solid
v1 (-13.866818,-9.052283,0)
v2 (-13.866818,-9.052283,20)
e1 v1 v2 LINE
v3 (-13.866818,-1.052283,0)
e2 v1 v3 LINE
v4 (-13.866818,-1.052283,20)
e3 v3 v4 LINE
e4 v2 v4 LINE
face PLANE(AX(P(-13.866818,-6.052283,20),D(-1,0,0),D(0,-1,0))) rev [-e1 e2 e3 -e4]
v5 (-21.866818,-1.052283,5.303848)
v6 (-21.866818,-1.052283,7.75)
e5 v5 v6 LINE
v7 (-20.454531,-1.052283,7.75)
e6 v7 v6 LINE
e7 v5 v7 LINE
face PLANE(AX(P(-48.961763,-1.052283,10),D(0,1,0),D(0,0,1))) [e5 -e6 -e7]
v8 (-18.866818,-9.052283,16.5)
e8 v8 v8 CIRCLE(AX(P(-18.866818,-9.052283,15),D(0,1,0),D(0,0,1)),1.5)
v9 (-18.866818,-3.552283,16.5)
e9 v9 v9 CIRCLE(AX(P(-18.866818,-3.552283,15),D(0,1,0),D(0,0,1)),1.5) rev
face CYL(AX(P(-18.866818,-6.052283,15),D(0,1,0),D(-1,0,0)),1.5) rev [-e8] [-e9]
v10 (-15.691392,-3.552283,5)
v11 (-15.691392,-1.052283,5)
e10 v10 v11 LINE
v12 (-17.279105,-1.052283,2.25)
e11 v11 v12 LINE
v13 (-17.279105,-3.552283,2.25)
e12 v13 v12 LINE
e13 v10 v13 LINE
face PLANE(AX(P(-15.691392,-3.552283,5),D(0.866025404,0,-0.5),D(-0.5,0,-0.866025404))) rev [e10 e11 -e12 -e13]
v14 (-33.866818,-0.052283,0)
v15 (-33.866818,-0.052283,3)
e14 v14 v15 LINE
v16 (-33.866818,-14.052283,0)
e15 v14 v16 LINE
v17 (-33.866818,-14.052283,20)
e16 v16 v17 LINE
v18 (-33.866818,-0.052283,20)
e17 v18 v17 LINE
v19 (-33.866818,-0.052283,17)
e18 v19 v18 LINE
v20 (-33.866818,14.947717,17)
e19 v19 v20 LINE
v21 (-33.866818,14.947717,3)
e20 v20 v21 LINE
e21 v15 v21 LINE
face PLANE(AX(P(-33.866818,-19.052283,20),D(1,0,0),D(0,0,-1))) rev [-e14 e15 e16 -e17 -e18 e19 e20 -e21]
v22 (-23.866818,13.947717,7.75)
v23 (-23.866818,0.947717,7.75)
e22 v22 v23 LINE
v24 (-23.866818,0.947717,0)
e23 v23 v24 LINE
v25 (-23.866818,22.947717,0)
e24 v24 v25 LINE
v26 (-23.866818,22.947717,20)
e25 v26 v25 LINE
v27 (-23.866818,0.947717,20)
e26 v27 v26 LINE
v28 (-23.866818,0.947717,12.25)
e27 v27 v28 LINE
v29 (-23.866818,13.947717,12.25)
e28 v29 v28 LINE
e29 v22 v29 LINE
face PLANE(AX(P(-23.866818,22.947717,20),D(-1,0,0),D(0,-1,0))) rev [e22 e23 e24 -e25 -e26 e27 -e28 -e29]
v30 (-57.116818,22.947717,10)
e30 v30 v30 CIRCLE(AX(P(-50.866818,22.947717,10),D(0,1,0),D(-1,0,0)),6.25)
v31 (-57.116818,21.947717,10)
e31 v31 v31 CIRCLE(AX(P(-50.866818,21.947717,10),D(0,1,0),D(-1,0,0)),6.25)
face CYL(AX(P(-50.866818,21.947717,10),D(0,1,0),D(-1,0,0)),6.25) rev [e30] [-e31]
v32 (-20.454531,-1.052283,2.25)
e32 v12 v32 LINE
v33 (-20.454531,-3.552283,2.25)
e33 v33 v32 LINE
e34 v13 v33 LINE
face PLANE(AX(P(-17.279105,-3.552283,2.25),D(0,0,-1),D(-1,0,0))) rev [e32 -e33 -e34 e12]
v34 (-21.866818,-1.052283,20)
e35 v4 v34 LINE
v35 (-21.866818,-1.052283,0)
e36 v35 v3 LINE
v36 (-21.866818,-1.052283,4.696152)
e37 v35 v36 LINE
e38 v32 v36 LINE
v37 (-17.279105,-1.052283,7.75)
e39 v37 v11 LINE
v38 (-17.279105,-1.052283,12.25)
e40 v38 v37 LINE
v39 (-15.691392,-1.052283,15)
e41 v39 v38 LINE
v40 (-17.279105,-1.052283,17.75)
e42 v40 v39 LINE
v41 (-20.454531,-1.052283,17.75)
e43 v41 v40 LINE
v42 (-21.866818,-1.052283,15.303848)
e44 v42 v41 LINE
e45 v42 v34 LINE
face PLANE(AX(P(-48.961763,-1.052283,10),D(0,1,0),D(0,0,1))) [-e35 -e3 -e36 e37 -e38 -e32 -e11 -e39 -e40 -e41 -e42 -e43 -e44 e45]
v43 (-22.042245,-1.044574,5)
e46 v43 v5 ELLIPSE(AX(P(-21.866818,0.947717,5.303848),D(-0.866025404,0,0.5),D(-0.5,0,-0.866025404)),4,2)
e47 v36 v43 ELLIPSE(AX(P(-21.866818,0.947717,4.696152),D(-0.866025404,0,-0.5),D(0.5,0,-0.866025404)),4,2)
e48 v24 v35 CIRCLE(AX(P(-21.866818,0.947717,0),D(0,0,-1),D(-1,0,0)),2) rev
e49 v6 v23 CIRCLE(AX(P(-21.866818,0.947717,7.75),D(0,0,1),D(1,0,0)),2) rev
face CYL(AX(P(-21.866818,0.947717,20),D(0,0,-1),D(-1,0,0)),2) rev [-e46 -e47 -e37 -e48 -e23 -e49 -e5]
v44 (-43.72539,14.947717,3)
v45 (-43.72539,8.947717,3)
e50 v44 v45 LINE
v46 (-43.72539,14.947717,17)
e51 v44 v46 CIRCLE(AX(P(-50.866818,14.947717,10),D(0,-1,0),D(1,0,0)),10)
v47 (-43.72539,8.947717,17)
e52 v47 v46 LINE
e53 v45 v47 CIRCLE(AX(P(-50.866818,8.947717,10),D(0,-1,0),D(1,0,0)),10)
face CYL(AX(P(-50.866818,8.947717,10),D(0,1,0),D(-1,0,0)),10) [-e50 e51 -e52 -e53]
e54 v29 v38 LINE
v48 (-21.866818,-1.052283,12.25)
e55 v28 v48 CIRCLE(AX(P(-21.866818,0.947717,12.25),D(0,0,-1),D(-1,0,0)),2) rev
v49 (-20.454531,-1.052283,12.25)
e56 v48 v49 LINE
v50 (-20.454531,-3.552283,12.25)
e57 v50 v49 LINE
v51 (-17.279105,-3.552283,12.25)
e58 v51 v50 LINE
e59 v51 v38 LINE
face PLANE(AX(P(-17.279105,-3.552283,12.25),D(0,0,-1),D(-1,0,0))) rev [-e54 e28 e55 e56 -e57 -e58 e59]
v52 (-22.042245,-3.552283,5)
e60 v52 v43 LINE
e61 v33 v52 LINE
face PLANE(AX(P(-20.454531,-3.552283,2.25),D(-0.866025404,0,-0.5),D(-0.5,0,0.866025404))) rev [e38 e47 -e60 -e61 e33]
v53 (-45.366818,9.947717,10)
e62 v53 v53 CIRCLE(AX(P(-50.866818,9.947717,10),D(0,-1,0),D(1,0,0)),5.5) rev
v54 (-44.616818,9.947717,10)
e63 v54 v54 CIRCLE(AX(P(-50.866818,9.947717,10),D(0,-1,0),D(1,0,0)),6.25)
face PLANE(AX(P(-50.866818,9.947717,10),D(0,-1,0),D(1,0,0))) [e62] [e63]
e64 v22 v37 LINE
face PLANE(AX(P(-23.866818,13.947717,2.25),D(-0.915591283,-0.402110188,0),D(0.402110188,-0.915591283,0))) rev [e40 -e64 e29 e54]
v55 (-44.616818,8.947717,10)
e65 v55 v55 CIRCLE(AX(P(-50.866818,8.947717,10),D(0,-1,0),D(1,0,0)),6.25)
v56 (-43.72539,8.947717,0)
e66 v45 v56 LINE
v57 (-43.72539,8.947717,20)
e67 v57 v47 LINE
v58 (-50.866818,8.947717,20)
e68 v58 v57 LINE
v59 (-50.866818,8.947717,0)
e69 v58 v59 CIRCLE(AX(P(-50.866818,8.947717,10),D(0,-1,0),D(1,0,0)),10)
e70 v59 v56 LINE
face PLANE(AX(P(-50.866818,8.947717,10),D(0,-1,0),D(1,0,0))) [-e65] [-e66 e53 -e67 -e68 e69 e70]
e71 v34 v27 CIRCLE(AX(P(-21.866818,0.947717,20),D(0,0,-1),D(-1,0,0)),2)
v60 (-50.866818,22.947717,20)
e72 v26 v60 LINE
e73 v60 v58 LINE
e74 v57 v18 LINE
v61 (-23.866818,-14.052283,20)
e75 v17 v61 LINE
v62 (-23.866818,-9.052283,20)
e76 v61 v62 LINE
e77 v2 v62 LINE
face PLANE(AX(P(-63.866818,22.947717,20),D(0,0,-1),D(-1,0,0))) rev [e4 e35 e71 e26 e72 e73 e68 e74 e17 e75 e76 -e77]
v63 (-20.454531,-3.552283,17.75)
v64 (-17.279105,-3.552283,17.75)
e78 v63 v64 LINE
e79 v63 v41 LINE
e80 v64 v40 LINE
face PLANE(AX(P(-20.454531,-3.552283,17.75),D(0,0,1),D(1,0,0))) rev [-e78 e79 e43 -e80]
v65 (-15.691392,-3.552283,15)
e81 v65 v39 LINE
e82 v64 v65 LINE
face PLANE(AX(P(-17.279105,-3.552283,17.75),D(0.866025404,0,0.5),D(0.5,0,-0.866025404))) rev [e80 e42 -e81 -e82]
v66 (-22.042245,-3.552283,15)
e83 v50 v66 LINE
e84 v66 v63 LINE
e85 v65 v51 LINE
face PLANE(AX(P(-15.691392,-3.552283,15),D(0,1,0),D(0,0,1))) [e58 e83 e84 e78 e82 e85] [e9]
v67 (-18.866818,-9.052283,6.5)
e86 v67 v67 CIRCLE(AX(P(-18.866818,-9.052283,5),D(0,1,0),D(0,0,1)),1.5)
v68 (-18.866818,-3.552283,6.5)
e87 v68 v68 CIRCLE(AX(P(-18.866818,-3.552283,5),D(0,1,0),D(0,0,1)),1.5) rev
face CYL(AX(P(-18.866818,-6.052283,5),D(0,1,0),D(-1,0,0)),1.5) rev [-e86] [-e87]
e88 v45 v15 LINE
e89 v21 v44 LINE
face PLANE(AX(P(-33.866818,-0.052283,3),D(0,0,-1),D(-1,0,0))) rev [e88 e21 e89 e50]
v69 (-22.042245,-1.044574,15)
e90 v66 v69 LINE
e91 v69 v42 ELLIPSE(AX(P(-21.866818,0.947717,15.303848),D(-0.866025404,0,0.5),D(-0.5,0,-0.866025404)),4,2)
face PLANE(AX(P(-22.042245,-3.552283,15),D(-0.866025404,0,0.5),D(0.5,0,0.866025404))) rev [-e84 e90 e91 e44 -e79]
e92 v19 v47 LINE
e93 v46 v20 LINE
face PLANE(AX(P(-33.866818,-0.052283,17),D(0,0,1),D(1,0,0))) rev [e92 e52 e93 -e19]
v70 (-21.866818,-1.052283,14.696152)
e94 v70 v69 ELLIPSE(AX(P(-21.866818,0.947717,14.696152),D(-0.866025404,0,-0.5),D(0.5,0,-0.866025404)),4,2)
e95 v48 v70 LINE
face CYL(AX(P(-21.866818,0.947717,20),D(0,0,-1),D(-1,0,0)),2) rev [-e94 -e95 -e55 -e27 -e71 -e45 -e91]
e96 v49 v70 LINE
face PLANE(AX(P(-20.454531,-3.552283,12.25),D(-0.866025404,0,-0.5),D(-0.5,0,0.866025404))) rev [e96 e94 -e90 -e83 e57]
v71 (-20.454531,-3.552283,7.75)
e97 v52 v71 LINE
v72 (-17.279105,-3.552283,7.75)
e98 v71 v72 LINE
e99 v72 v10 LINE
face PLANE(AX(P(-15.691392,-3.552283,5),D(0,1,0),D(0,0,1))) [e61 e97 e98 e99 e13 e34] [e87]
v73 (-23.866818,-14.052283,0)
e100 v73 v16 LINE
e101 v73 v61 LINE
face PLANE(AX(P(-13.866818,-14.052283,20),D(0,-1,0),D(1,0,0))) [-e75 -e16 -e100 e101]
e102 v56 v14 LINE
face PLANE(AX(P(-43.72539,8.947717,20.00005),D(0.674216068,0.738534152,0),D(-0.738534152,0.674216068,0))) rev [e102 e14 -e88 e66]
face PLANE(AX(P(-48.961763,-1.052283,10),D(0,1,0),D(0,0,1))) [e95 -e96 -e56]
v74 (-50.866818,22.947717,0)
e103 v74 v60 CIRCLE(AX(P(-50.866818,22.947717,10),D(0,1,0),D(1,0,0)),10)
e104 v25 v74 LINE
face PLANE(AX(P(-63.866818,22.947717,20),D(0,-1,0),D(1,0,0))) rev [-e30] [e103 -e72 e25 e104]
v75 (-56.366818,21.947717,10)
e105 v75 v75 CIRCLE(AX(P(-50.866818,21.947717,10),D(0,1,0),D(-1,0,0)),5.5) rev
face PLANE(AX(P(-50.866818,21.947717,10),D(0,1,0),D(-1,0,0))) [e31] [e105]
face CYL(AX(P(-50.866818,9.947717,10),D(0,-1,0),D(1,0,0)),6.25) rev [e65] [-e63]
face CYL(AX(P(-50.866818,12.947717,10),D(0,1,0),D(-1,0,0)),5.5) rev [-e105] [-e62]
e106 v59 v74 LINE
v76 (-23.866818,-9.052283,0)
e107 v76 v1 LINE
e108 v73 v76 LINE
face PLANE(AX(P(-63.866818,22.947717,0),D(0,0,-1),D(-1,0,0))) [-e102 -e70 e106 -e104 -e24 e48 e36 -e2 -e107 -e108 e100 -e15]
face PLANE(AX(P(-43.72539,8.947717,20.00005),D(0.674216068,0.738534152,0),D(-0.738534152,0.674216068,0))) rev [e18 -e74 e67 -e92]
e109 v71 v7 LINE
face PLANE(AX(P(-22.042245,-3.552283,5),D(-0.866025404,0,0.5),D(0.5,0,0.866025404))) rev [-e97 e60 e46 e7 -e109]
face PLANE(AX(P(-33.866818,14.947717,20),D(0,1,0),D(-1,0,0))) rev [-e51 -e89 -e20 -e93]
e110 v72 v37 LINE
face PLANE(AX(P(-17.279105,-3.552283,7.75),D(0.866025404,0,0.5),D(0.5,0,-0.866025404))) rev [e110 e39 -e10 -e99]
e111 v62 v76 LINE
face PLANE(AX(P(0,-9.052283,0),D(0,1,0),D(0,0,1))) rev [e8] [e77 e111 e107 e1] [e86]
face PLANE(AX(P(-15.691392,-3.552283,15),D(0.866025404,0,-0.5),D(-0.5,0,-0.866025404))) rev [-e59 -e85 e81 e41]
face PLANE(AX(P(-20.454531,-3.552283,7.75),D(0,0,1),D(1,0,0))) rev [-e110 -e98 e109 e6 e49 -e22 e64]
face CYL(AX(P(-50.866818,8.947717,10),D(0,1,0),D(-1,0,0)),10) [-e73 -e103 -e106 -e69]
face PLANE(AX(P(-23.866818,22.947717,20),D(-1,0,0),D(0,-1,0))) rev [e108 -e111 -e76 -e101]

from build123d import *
from build123d.topology import SkipClean

# Parameters (mm, degrees)
EXTRUDE_1_DEPTH           = 20
SKETCH_3_R                = 5.5
CUT_EXTRUDE_2_DEPTH       = 10
SKETCH_9_R                = 6.25
CUT_EXTRUDE_6_DEPTH       = 1
SKETCH_11_W               = 20
SKETCH_11_H               = 5
EXTRUDE_4_DEPTH           = 10
CUT_EXTRUDE_8_REACH       = 78.472
SKETCH_12_R               = 1.5
SKETCH_13_R               = 3
CUT_EXTRUDE_9_DEPTH       = 2.5
SKETCH_14_R               = 10
SKETCH_14_R_2             = 5.5
EXTRUDE_5_DEPTH           = 6
CUT_EXTRUDE_START         = -1
SKETCH_6_R                = 6.25
CUT_EXTRUDE_10_DEPTH      = 1
SKETCH_15_W               = 20
SKETCH_15_H               = 5
EXTRUDE_6_DEPTH           = 5
SKETCH_16_W               = 17
SKETCH_16_H               = 3
EXTRUDE_7_DEPTH           = 15
CUT_EXTRUDE_11_DEPTH      = 70.961190435
CUT_EXTRUDE_11_DEPTH_BACK = 70.961190435
EXTRUDE_START             = -5
SKETCH_3D_3_R             = 1.5
EXTRUDE_8_DEPTH           = 5
CUT_EXTRUDE_12_DEPTH      = 2.5
FILLET_1_R                = 2
CUT_EXTRUDE_14_DEPTH      = 76.06644022
SKETCH_21_W               = 6.587713241
SKETCH_21_H               = 4.5
EXTRUDE_9_DEPTH           = 15
SKETCH_23_W               = 25
SKETCH_23_H               = 20
CUT_EXTRUDE_16_DEPTH      = 5
CUT_EXTRUDE_17_DEPTH      = 10
SKETCH_25_W               = 10
SKETCH_25_H               = 20
EXTRUDE_10_DEPTH          = 3
SKETCH_26_R               = 1.5
CUT_EXTRUDE_18_DEPTH      = 71.326165394
SKETCH_27_R               = 1.5
CUT_EXTRUDE_19_DEPTH      = 71.326165394


with BuildPart() as part:
    # 草图1 → 凸台-拉伸1 (new body)
    with BuildSketch(Plane.XY):
        Polygon((-63.866818046, 22.947717095), (-23.866818046, 22.947717095), (-23.866818046, -19.052282905), (-33.866818046, -19.052282905), (-33.866818046, 14.947717095), (-63.866818046, 14.947717095), align=None)
    extrude(amount=EXTRUDE_1_DEPTH)

    # 草图3 → 切除-拉伸2 (cut)
    with BuildSketch(Plane(origin=(0, 22.947717095, 0), x_dir=(-1, 0, 0), z_dir=(0, 1, 0))):
        with Locations((50.866818046, 10)):
            Circle(SKETCH_3_R)
    extrude(amount=-CUT_EXTRUDE_2_DEPTH, mode=Mode.SUBTRACT)

    # 草图9 → 切除-拉伸6 (cut)
    with BuildSketch(Plane(origin=(0, 22.947717095, 0), x_dir=(1, 0, 0), z_dir=(0, 1, 0))):
        with Locations(Location((-50.866818046, -10, 0), (0, 0, 180))):
            Circle(SKETCH_9_R)
    extrude(amount=-CUT_EXTRUDE_6_DEPTH, mode=Mode.SUBTRACT)

    # 草图11 → 凸台-拉伸4 (add)
    with BuildSketch(Plane(origin=(-23.866818046, 0, 0), x_dir=(0, 0, -1), z_dir=(1, 0, 0))):
        with Locations((-10, -16.552282905)):
            Rectangle(SKETCH_11_W, SKETCH_11_H)
    extrude(amount=EXTRUDE_4_DEPTH)

    # 草图12 → 切除-拉伸8 (cut, up to next)
    with BuildSketch(Plane(origin=(0, -14.052282905, 0), x_dir=(-1, 0, 0), z_dir=(0, 1, 0)), mode=Mode.PRIVATE) as cut_extrude_8_sk1:
        with Locations((18.866818046, 5)):
            Circle(SKETCH_12_R)
    cut_extrude_8_tool1 = extrude(cut_extrude_8_sk1.sketch, amount=-CUT_EXTRUDE_8_REACH, mode=Mode.PRIVATE) & part.part
    # 草图12 → 切除-拉伸8 (cut, up to next)
    with BuildSketch(Plane(origin=(0, -14.052282905, 0), x_dir=(-1, 0, 0), z_dir=(0, 1, 0)), mode=Mode.PRIVATE) as cut_extrude_8_sk2:
        with Locations((18.866818046, 15)):
            Circle(SKETCH_12_R)
    cut_extrude_8_tool2 = extrude(cut_extrude_8_sk2.sketch, amount=-CUT_EXTRUDE_8_REACH, mode=Mode.PRIVATE) & part.part
    add(cut_extrude_8_tool1.solids().sort_by_distance((-18.866818, -14.052283, 5))[0], mode=Mode.SUBTRACT)
    add(cut_extrude_8_tool2.solids().sort_by_distance((-18.866818, -14.052283, 15))[0], mode=Mode.SUBTRACT)

    # 草图13 → 切除-拉伸9 (cut)
    with BuildSketch(Plane.XZ.offset(19.052282905)):
        with Locations(Location((-18.866818046, 15, 0), (0, 0, 270))):
            Circle(SKETCH_13_R)
        with Locations(Location((-18.866818046, 5, 0), (0, 0, 270))):
            Circle(SKETCH_13_R)
    extrude(amount=-CUT_EXTRUDE_9_DEPTH, mode=Mode.SUBTRACT)

    # 草图14 → 凸台-拉伸5 (add)
    with SkipClean():  # the faces are left unmerged after this step: merging them gives an invalid solid
        with BuildSketch(Plane.XZ.offset(-14.947717095)):
            with Locations(Location((-50.866818046, 10, 0), (0, 0, 270))):
                Circle(SKETCH_14_R)
            with Locations(Location((-50.866818046, 10, 0), (0, 0, 180))):
                Circle(SKETCH_14_R_2, mode=Mode.SUBTRACT)
        extrude(amount=EXTRUDE_5_DEPTH)

    # 草图6 → 切除-拉伸10 (cut)
    with BuildSketch(Plane.XZ.offset(-8.947717095).offset(CUT_EXTRUDE_START)):
        with Locations(Location((-50.866818046, 10, 0), (0, 0, 180))):
            Circle(SKETCH_6_R)
    extrude(amount=CUT_EXTRUDE_10_DEPTH, mode=Mode.SUBTRACT)

    # 草图15 → 凸台-拉伸6 (add)
    with BuildSketch(Plane(origin=(-13.866818046, 0, 0), x_dir=(0, 0, -1), z_dir=(1, 0, 0))):
        with Locations((-10, -16.552282905)):
            Rectangle(SKETCH_15_W, SKETCH_15_H)
    extrude(amount=EXTRUDE_6_DEPTH)

    # 草图16 → 凸台-拉伸7 (add)
    with BuildSketch(Plane.XZ.offset(-14.947717095)):
        with Locations((-42.366818046, 18.5)):
            Rectangle(SKETCH_16_W, SKETCH_16_H)
        with Locations((-42.366818046, 1.5)):
            Rectangle(SKETCH_16_W, SKETCH_16_H)
    extrude(amount=EXTRUDE_7_DEPTH)

    # 草图17 → 切除-拉伸11 (cut, two sides: drawn at the far end of the back side and taken through both)
    with BuildSketch(Plane(origin=(0, 0, 17), x_dir=(-1, 0, 0), z_dir=(0, 0, -1)).offset(-CUT_EXTRUDE_11_DEPTH_BACK)):
        Polygon((50.866818046, 8.947717095), (43.725389617, 8.947717095), (33.866818046, -0.052282905), (50.866818046, -0.052282905), align=None)
    extrude(amount=CUT_EXTRUDE_11_DEPTH + CUT_EXTRUDE_11_DEPTH_BACK, mode=Mode.SUBTRACT)

    # Sketch 3D_3 → 凸台-拉伸8 (add)
    with BuildSketch(Plane(origin=(-23.866818046, -6.052282905, 20), x_dir=(0.447213595499958, 0, -0.894427190999916), z_dir=(0, -1, 0)).offset(EXTRUDE_START)):
        Polygon((0, 0), (4.472135955, 8.94427191), (22.360679775, 0), (17.88854382, -8.94427191), align=None)
        with Locations(Location((6.708203932, 2.236067977, 0), (0, 0, 243.434948823))):
            Circle(SKETCH_3D_3_R, mode=Mode.SUBTRACT)
        with Locations(Location((15.652475842, -2.236067977, 0), (0, 0, 243.434948823))):
            Circle(SKETCH_3D_3_R, mode=Mode.SUBTRACT)
    extrude(amount=EXTRUDE_8_DEPTH)

    # 草图18 → 切除-拉伸12 (cut)
    with BuildSketch(Plane(origin=(0, -1.052282905, 0), x_dir=(-1, 0, 0), z_dir=(0, 1, 0))):
        Polygon((15.691391565, 15), (17.279104805, 12.25), (20.454531286, 12.25), (22.042244526, 15), (20.454531286, 17.75), (17.279104805, 17.75), align=None)
        Polygon((15.691391565, 5), (17.279104805, 2.25), (20.454531286, 2.25), (22.042244526, 5), (20.454531286, 7.75), (17.279104805, 7.75), align=None)
    extrude(amount=-CUT_EXTRUDE_12_DEPTH, mode=Mode.SUBTRACT)

    # 圆角1
    # the kernel refuses this fillet: 2 mm, written as the material it adds along each edge
    with BuildSketch(Plane(origin=(-23.866818046, -1.052282905, 0), x_dir=(0, 1, 0), z_dir=(0, 0, 1))) as fillet_1_piece_1_section:
        with BuildLine():
            CenterArc((FILLET_1_R, -FILLET_1_R), FILLET_1_R, 90, 90)
            Line((0, -FILLET_1_R), (0, 0))
            Line((0, 0), (FILLET_1_R, 0))
        make_face()
    fillet_1_piece_1 = extrude(amount=20, mode=Mode.PRIVATE)
    fillet_1_piece_1 = split(fillet_1_piece_1, bisect_by=Plane(origin=(-20.802583542, -0.671658343, 2.852844192), z_dir=(-0.8660254037844387, 0, -0.5000000000000001)), keep=Keep.TOP, mode=Mode.PRIVATE)
    fillet_1_piece_1 = split(fillet_1_piece_1, bisect_by=Plane(origin=(-23.907001975, -0.671658343, 1.770145354), z_dir=(0.8660254037844387, 0, -0.5000000000000003)), keep=Keep.TOP, mode=Mode.PRIVATE)
    add(fillet_1_piece_1)
    with BuildSketch(Plane(origin=(-23.866818046, -1.052282905, 0), x_dir=(0, 1, 0), z_dir=(0, 0, 1))) as fillet_1_piece_2_section:
        with BuildLine():
            CenterArc((FILLET_1_R, -FILLET_1_R), FILLET_1_R, 90, 90)
            Line((0, -FILLET_1_R), (0, 0))
            Line((0, 0), (FILLET_1_R, 0))
        make_face()
    fillet_1_piece_2 = extrude(amount=20, mode=Mode.PRIVATE)
    fillet_1_piece_2 = split(fillet_1_piece_2, bisect_by=Plane(origin=(-22.4188867, -0.519681884, 5.652363381), z_dir=(-0.8660254037844387, 0, -0.5000000000000001)), keep=Keep.TOP, mode=Mode.PRIVATE)
    fillet_1_piece_2 = split(fillet_1_piece_2, bisect_by=Plane(origin=(-22.4188867, -0.519681884, 4.347636619), z_dir=(-0.8660254037844387, 0, 0.5000000000000003)), keep=Keep.TOP, mode=Mode.PRIVATE)
    add(fillet_1_piece_2)
    with BuildSketch(Plane(origin=(-23.866818046, -1.052282905, 0), x_dir=(0, 1, 0), z_dir=(0, 0, 1))) as fillet_1_piece_3_section:
        with BuildLine():
            CenterArc((FILLET_1_R, -FILLET_1_R), FILLET_1_R, 90, 90)
            Line((0, -FILLET_1_R), (0, 0))
            Line((0, 0), (FILLET_1_R, 0))
        make_face()
    fillet_1_piece_3 = extrude(amount=20, mode=Mode.PRIVATE)
    fillet_1_piece_3 = split(fillet_1_piece_3, bisect_by=Plane(origin=(-24.519856268, -0.671658343, 9.291349419), z_dir=(0.8660254037844387, 0, 0.5000000000000001)), keep=Keep.TOP, mode=Mode.PRIVATE)
    fillet_1_piece_3 = split(fillet_1_piece_3, bisect_by=Plane(origin=(-20.189729249, -0.671658343, 8.208650581), z_dir=(-0.8660254037844387, 0, 0.5000000000000003)), keep=Keep.TOP, mode=Mode.PRIVATE)
    fillet_1_piece_3 = split(fillet_1_piece_3, bisect_by=Plane(origin=(-20.189729249, -0.671658343, 11.791349419), z_dir=(-0.8660254037844387, 0, -0.5)), keep=Keep.TOP, mode=Mode.PRIVATE)
    fillet_1_piece_3 = split(fillet_1_piece_3, bisect_by=Plane(origin=(-24.519856268, -0.671658343, 10.708650581), z_dir=(0.8660254037844384, 0, -0.5000000000000004)), keep=Keep.TOP, mode=Mode.PRIVATE)
    add(fillet_1_piece_3)
    with BuildSketch(Plane(origin=(-23.866818046, -1.052282905, 0), x_dir=(0, 1, 0), z_dir=(0, 0, 1))) as fillet_1_piece_4_section:
        with BuildLine():
            CenterArc((FILLET_1_R, -FILLET_1_R), FILLET_1_R, 90, 90)
            Line((0, -FILLET_1_R), (0, 0))
            Line((0, 0), (FILLET_1_R, 0))
        make_face()
    fillet_1_piece_4 = extrude(amount=20, mode=Mode.PRIVATE)
    fillet_1_piece_4 = split(fillet_1_piece_4, bisect_by=Plane(origin=(-22.4188867, -0.519681884, 15.652363381), z_dir=(-0.8660254037844387, 0, -0.5)), keep=Keep.TOP, mode=Mode.PRIVATE)
    fillet_1_piece_4 = split(fillet_1_piece_4, bisect_by=Plane(origin=(-22.4188867, -0.519681884, 14.347636619), z_dir=(-0.8660254037844384, 0, 0.5000000000000004)), keep=Keep.TOP, mode=Mode.PRIVATE)
    add(fillet_1_piece_4)
    with BuildSketch(Plane(origin=(-23.866818046, -1.052282905, 0), x_dir=(0, 1, 0), z_dir=(0, 0, 1))) as fillet_1_piece_5_section:
        with BuildLine():
            CenterArc((FILLET_1_R, -FILLET_1_R), FILLET_1_R, 90, 90)
            Line((0, -FILLET_1_R), (0, 0))
            Line((0, 0), (FILLET_1_R, 0))
        make_face()
    fillet_1_piece_5 = extrude(amount=20, mode=Mode.PRIVATE)
    fillet_1_piece_5 = split(fillet_1_piece_5, bisect_by=Plane(origin=(-23.907001975, -0.671658343, 18.229854646), z_dir=(0.8660254037844387, 0, 0.5)), keep=Keep.TOP, mode=Mode.PRIVATE)
    fillet_1_piece_5 = split(fillet_1_piece_5, bisect_by=Plane(origin=(-20.802583542, -0.671658343, 17.147155808), z_dir=(-0.8660254037844384, 0, 0.5000000000000004)), keep=Keep.TOP, mode=Mode.PRIVATE)
    add(fillet_1_piece_5)

    # 草图20 → 切除-拉伸14 (cut, through all)
    with SkipClean():  # the faces are left unmerged after this step: merging them gives an invalid solid
        with BuildSketch(Plane.XZ.offset(-14.947717095)):
            with BuildLine():
                Line((-63.866818046, 20), (-50.866818046, 20))
                ThreePointArc((-50.866818046, 20), (-60.866818046, 10), (-50.866818046, 0))
                Line((-50.866818046, 0), (-63.866818046, 0))
                Line((-63.866818046, 0), (-63.866818046, 20))
            make_face()
        extrude(amount=-CUT_EXTRUDE_14_DEPTH, mode=Mode.SUBTRACT)
    add(part.part.scale(1), mode=Mode.REPLACE)  # the faces are merged on a copy

    # 草图21 → 凸台-拉伸9 (add)
    with BuildSketch(Plane(origin=(0, -1.052282905, 0), x_dir=(1, 0, 0), z_dir=(0, 1, 0))):
        with Locations((-20.572961426, -10)):
            Rectangle(SKETCH_21_W, SKETCH_21_H)
    extrude(amount=EXTRUDE_9_DEPTH)

    # 草图23 → 切除-拉伸16 (cut)
    with BuildSketch(Plane.XZ.offset(19.052282905)):
        with Locations((-21.366818046, 10)):
            Rectangle(SKETCH_23_W, SKETCH_23_H)
    extrude(amount=-CUT_EXTRUDE_16_DEPTH, mode=Mode.SUBTRACT)

    # 草图24 → 切除-拉伸17 (cut)
    with BuildSketch(Plane.XY.offset(12.25)):
        Polygon((-23.866818046, 13.947717095), (-17.279104805, -1.052282905), (-17.279104805, 13.947717095), align=None)
    extrude(amount=-CUT_EXTRUDE_17_DEPTH, mode=Mode.SUBTRACT)

    # 草图25 → 凸台-拉伸10 (add)
    with BuildSketch(Plane.XZ.offset(6.052282905)):
        with Locations((-18.866818046, 10)):
            Rectangle(SKETCH_25_W, SKETCH_25_H)
    extrude(amount=EXTRUDE_10_DEPTH)

    # 草图26 → 切除-拉伸18 (cut, through all)
    with BuildSketch(Plane(origin=(0, -6.052282905, 0), x_dir=(1, 0, 0), z_dir=(0, 1, 0))):
        with Locations(Location((-18.866818046, -15, 0), (0, 0, 270))):
            Circle(SKETCH_26_R)
    extrude(amount=-CUT_EXTRUDE_18_DEPTH, mode=Mode.SUBTRACT)

    # 草图27 → 切除-拉伸19 (cut, through all)
    with BuildSketch(Plane(origin=(0, -6.052282905, 0), x_dir=(1, 0, 0), z_dir=(0, 1, 0))):
        with Locations(Location((-18.866818046, -5, 0), (0, 0, 270))):
            Circle(SKETCH_27_R)
    extrude(amount=-CUT_EXTRUDE_19_DEPTH, mode=Mode.SUBTRACT)


solid = part.part
